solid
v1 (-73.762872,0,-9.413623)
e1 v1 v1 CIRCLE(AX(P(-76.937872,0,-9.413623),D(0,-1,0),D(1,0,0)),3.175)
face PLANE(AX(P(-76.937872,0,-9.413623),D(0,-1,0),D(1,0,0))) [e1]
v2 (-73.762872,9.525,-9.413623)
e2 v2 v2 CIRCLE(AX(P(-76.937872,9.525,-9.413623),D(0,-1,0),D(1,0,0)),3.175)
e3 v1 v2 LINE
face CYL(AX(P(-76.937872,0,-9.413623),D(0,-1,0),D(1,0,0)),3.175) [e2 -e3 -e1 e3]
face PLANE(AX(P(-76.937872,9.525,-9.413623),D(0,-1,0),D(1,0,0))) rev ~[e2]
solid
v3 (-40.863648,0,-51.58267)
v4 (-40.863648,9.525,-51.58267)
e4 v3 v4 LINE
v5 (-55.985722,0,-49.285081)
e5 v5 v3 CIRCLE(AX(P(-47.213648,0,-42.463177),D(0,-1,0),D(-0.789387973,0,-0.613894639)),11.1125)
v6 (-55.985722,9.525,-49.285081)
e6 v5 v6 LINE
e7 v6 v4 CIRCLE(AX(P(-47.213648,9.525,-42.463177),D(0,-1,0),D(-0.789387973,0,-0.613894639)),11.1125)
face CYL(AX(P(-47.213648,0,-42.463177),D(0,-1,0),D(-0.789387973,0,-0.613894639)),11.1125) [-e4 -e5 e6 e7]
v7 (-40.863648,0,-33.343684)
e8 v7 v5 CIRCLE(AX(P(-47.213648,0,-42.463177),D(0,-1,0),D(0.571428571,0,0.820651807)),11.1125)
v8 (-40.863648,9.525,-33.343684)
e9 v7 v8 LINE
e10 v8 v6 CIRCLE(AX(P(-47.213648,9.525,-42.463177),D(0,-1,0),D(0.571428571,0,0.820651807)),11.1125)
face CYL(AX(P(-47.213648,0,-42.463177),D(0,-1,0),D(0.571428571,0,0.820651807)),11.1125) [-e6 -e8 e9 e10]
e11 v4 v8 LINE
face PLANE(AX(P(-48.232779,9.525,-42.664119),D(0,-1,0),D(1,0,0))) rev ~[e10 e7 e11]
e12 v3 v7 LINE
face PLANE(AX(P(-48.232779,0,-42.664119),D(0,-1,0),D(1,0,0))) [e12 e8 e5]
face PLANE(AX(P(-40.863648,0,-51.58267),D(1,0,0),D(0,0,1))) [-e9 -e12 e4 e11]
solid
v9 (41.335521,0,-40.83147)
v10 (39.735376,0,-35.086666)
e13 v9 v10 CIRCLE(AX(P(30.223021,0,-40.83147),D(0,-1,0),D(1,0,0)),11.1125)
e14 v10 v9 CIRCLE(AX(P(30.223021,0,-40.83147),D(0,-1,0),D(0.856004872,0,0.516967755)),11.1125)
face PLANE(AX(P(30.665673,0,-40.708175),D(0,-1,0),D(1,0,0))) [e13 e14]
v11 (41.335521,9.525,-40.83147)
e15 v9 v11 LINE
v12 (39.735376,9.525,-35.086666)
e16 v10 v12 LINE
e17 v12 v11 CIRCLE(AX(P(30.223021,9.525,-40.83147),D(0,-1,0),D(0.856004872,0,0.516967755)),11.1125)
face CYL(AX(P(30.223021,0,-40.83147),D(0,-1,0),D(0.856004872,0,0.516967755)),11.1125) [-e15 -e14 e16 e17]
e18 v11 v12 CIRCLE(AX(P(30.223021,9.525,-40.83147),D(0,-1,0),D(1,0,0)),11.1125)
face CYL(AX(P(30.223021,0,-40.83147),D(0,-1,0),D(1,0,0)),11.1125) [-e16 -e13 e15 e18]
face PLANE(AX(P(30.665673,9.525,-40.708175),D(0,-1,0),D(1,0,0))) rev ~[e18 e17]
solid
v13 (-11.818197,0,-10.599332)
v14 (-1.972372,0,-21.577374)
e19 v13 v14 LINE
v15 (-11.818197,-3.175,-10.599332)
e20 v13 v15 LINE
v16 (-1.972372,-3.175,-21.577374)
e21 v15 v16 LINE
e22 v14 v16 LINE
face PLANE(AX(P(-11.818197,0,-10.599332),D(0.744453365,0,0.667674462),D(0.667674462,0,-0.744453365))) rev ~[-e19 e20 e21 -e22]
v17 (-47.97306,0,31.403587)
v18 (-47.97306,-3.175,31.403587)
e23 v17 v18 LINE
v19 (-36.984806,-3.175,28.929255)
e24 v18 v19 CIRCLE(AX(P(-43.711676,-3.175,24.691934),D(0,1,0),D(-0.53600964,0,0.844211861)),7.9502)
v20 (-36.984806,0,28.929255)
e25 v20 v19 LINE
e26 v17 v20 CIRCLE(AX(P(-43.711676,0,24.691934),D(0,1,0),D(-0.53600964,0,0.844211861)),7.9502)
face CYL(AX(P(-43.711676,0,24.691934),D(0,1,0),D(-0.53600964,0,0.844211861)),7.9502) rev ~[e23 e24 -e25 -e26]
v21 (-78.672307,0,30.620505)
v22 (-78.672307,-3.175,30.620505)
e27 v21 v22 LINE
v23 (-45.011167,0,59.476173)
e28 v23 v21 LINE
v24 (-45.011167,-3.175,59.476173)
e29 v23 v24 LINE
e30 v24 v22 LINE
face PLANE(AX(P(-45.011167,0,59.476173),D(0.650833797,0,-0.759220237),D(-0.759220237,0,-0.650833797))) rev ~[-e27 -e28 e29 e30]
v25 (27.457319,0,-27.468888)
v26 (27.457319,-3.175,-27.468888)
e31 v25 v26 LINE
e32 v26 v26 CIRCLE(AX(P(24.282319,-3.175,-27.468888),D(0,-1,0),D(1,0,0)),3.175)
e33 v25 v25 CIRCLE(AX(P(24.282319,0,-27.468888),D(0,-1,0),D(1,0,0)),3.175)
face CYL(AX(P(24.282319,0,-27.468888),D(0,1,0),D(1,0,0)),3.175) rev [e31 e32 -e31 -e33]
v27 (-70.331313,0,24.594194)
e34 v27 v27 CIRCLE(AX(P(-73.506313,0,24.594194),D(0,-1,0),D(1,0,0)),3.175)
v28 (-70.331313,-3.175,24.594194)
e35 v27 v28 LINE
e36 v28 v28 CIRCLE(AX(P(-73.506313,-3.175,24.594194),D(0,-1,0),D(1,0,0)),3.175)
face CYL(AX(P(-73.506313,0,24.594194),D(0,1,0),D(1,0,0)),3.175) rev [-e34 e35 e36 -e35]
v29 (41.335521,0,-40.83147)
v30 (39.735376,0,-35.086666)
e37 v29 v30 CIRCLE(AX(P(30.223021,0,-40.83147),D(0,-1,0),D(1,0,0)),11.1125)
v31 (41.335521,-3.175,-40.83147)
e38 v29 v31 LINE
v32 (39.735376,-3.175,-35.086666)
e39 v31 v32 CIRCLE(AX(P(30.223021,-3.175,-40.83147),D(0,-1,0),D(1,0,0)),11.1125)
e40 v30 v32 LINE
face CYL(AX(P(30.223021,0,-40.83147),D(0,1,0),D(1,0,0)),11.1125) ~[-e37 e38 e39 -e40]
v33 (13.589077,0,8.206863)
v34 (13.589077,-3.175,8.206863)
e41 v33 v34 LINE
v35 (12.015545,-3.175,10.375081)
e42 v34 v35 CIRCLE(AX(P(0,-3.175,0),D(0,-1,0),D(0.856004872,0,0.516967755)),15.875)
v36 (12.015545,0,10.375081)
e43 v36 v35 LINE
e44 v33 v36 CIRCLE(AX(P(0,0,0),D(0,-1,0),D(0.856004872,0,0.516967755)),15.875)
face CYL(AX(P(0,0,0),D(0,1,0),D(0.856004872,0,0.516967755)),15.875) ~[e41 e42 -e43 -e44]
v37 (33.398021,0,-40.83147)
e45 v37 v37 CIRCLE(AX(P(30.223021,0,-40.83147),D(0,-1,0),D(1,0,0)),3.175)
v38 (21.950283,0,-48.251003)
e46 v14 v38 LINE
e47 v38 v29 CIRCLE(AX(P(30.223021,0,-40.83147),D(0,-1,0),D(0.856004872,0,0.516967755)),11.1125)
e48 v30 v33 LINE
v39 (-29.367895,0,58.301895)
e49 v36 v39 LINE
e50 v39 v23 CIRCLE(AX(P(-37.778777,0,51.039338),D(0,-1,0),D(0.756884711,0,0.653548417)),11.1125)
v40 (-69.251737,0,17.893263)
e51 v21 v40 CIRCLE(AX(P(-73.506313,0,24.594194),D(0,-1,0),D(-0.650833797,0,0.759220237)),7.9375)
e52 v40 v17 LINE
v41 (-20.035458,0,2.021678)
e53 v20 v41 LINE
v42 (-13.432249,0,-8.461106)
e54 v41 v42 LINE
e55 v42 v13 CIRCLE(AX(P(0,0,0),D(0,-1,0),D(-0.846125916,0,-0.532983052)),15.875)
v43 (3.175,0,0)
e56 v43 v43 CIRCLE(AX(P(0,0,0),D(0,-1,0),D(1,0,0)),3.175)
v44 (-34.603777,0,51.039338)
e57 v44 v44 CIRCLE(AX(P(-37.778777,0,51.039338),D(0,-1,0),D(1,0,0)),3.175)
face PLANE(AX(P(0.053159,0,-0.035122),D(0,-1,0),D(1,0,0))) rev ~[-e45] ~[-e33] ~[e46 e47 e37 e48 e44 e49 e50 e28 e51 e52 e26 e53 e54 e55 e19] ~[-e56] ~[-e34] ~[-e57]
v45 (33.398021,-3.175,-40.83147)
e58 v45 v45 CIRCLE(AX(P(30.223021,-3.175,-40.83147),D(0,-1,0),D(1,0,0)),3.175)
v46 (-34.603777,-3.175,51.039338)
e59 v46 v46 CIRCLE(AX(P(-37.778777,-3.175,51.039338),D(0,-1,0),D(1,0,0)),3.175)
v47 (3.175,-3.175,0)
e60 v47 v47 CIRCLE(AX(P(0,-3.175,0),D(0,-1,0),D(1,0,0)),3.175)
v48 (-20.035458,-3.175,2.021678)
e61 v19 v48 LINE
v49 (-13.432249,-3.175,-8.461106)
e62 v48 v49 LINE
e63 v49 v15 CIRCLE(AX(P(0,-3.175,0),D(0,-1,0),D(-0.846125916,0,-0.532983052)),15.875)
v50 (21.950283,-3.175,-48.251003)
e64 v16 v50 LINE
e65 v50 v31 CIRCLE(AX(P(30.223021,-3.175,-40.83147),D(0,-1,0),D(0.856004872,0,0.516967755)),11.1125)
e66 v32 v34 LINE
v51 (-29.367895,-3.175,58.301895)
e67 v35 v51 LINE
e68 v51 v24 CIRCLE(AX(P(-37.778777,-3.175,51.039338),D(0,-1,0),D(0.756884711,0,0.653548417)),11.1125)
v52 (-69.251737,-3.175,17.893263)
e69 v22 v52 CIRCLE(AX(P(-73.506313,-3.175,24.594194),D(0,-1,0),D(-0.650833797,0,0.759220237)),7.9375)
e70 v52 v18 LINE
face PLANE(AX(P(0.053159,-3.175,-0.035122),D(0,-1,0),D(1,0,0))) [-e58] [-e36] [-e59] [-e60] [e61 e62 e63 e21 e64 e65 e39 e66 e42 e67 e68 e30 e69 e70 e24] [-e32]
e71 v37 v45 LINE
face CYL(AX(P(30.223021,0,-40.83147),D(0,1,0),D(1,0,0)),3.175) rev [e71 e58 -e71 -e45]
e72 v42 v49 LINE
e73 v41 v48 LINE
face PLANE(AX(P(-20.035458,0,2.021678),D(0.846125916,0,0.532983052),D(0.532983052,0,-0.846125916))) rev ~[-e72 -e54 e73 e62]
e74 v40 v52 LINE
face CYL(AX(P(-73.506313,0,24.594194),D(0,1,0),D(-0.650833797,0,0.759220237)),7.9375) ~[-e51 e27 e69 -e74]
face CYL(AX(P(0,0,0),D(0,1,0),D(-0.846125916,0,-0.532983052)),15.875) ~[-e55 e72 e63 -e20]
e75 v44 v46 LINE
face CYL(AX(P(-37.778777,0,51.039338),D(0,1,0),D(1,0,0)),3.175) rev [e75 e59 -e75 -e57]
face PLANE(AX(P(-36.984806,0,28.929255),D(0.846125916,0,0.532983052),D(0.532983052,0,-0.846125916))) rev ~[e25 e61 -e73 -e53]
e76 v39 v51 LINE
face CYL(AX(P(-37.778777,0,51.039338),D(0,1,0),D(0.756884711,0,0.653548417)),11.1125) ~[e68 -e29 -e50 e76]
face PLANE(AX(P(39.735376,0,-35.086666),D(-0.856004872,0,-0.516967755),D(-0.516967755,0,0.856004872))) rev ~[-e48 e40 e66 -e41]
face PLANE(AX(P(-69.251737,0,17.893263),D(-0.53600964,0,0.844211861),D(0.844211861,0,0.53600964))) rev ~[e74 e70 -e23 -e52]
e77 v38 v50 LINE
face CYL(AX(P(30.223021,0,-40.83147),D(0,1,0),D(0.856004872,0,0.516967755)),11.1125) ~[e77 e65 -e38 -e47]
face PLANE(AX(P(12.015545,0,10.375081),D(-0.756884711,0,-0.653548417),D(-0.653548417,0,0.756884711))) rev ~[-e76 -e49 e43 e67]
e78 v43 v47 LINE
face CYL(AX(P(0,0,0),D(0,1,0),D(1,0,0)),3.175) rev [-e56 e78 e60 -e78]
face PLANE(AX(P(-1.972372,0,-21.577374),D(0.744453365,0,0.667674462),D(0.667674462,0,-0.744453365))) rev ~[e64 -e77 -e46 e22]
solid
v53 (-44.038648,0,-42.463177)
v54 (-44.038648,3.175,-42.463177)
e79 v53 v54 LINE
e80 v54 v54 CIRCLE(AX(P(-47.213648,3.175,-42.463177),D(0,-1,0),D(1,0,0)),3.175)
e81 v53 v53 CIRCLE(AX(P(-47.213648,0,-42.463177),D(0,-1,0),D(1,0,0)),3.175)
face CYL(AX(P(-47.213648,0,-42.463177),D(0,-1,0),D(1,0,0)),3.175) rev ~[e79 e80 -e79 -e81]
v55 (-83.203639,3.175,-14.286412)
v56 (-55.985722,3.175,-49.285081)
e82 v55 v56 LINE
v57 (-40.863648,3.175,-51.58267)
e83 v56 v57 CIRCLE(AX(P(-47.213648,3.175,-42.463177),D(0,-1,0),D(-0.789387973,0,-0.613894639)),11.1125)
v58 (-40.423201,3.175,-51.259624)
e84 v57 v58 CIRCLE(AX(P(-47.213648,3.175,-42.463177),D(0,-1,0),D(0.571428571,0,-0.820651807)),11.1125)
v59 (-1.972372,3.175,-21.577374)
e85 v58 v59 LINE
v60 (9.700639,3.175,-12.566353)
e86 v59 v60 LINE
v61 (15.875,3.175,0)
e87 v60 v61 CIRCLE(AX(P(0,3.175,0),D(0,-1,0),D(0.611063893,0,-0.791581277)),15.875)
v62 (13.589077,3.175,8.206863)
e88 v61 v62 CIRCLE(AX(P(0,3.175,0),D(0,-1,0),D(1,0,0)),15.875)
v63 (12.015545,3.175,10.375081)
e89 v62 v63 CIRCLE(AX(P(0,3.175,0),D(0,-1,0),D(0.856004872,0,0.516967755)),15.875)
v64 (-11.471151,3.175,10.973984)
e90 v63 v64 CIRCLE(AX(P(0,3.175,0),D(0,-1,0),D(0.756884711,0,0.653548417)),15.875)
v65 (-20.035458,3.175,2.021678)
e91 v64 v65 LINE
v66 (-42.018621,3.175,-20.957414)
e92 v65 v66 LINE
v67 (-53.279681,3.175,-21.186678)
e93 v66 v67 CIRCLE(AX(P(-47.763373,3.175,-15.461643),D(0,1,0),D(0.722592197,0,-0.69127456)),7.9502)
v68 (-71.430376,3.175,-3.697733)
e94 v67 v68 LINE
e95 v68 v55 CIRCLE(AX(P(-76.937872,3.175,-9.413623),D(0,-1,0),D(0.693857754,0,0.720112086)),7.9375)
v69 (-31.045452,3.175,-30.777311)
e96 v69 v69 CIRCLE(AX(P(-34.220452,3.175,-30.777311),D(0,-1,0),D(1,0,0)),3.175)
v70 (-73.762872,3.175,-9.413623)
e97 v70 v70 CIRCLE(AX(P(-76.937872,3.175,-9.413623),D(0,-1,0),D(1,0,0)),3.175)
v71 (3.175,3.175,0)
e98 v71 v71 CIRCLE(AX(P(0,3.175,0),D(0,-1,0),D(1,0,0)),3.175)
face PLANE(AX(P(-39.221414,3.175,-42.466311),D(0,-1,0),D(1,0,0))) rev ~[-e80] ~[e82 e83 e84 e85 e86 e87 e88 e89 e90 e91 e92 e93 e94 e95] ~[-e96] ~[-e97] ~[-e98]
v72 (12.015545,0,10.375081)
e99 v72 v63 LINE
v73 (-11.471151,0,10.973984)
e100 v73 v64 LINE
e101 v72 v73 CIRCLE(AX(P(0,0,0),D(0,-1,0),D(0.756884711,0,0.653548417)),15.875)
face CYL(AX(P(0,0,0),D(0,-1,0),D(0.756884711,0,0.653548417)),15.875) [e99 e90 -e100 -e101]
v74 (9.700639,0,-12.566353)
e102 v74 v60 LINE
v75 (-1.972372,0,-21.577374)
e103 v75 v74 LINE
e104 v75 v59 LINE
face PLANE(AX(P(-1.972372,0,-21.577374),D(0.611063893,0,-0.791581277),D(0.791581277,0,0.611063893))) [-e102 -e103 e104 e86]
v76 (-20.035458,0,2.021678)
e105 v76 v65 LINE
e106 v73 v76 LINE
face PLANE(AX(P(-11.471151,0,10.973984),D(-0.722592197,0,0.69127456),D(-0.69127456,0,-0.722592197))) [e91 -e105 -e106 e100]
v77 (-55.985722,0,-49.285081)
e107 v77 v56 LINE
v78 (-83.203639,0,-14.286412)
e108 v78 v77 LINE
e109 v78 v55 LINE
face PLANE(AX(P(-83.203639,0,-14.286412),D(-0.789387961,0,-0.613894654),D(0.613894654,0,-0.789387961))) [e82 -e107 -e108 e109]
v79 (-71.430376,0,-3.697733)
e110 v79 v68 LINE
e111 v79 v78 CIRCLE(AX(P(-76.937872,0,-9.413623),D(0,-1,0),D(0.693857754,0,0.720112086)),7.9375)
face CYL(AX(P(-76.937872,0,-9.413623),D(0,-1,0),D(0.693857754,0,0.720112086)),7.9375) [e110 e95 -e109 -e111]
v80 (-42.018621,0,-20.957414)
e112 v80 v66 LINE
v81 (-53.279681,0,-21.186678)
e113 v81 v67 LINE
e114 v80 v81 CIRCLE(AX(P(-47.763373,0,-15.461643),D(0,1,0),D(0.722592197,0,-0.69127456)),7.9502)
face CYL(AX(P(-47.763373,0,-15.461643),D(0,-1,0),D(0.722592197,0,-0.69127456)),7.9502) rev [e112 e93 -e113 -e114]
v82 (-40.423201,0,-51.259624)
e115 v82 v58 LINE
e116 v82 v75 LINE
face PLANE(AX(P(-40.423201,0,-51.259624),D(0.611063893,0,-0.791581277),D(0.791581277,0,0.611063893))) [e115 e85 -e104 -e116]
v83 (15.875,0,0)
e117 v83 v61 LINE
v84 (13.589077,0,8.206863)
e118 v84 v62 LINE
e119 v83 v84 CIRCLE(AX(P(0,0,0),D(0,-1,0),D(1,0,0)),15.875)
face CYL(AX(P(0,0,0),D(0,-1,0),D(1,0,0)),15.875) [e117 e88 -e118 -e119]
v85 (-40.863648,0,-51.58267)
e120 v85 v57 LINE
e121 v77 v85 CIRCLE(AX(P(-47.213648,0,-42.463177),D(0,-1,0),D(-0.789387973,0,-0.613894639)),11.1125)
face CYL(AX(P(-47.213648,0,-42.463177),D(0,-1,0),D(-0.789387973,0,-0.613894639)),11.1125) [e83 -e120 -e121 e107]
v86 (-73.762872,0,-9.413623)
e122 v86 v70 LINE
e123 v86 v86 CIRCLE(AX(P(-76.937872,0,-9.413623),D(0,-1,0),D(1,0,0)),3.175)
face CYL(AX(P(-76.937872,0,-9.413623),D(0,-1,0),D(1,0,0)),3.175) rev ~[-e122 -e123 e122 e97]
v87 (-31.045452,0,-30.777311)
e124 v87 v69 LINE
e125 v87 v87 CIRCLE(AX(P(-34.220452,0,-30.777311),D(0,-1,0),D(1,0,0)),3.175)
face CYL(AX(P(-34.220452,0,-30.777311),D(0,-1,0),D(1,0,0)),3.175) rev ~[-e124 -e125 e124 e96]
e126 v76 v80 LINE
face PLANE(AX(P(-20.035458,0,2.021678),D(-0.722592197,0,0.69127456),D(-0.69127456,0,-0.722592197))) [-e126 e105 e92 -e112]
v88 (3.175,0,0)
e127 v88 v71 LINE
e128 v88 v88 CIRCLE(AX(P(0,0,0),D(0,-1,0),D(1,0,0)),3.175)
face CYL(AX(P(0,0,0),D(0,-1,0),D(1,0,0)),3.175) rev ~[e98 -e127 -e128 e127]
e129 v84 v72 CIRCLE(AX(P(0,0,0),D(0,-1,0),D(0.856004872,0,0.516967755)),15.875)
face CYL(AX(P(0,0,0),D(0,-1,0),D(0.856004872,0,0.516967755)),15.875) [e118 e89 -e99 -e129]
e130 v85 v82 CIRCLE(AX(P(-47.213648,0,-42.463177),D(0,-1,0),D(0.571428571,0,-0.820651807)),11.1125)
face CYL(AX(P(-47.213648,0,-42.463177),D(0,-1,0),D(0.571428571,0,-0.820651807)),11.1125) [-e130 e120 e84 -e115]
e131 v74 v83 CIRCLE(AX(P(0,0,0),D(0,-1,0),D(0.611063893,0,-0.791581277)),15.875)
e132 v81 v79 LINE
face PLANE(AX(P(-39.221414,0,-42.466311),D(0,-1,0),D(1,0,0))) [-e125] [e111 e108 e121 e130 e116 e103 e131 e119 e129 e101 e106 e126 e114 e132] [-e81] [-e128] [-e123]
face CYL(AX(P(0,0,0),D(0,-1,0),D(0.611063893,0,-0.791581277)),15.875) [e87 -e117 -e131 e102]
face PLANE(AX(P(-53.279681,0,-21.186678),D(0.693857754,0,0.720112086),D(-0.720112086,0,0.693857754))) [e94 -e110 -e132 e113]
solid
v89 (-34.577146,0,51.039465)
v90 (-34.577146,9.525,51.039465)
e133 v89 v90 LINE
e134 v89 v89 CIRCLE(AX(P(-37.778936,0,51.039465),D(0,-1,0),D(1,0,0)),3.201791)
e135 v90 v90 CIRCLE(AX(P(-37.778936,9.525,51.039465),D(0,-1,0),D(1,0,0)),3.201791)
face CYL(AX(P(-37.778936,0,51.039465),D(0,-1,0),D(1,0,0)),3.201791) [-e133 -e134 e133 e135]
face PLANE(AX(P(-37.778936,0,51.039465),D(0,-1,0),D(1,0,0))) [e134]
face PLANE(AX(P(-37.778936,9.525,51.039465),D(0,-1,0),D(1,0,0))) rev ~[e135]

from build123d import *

# Parameters (mm, degrees)
F0_R     = 3.175
F1_DEPTH = 3.175
F2_DEPTH = 3.175
F3_DEPTH = 3.175
F6_DEPTH = 9.525
F5_R     = 3.2017905818
F7_DEPTH = 9.525


with BuildPart() as f1:
    # F0 (on Front) → F1 (new body)
    with BuildSketch(Plane.XZ):
        with BuildLine():
            ThreePointArc((9.7006393072, -12.5663527737), (14.2480397599, -7.0006419705), (15.875, 0))
            ThreePointArc((15.875, 0), (15.2928451858, 4.2596374402), (13.589077339, 8.2068631081))
            ThreePointArc((13.589077339, 8.2068631081), (12.8481306417, 9.3242245797), (12.0155447944, 10.3750811223))
            ThreePointArc((12.0155447944, 10.3750811223), (0.4046753915, 15.8698412981), (-11.4711511247, 10.9739836374))
            ThreePointArc((-11.4711511247, 10.9739836374), (-15.7947937715, 1.5937737343), (-13.4322489239, -8.461105947))
            ThreePointArc((-13.4322489239, -8.461105947), (-12.6704088261, -9.5643277432), (-11.818197177, -10.5993320773))
            ThreePointArc((-11.818197177, -10.5993320773), (-1.4450970341, -15.8090897765), (9.7006393072, -12.5663527737))
        make_face()
        Circle(F0_R, mode=Mode.SUBTRACT)
        with BuildLine():
            Line((-1.9723715397, -21.5773737034), (9.7006393072, -12.5663527737))
            ThreePointArc((9.7006393072, -12.5663527737), (-1.4450970341, -15.8090897765), (-11.818197177, -10.5993320773))
            Line((-11.818197177, -10.5993320773), (-1.9723715397, -21.5773737034))
        make_face()
        with BuildLine():
            Line((-1.9723715397, -21.5773737034), (-11.818197177, -10.5993320773))
            ThreePointArc((-11.818197177, -10.5993320773), (-12.6704088261, -9.5643277432), (-13.4322489239, -8.461105947))
            Line((-13.4322489239, -8.461105947), (-20.0354577926, 2.0216779558))
            Line((-20.0354577926, 2.0216779558), (-42.0186206254, -20.9574143581))
            ThreePointArc((-42.0186206254, -20.9574143581), (-47.601548398, -23.4101962273), (-53.2796810271, -21.1866784606))
            Line((-53.2796810271, -21.1866784606), (-71.4303764219, -3.6977333553))
            ThreePointArc((-71.4303764219, -3.6977333553), (-69.6330912018, -6.308131344), (-69.0003723469, -9.4136230398))
            ThreePointArc((-69.0003723469, -9.4136230398), (-74.3620830362, -16.921566545), (-83.2036392891, -14.2864118589))
            Line((-83.2036392891, -14.2864118589), (-55.9857223186, -49.2850811473))
            ThreePointArc((-55.9857223186, -49.2850811473), (-55.2758223722, -34.8153662876), (-40.8636484691, -33.3436837668))
            ThreePointArc((-40.8636484691, -33.3436837668), (-37.3634700126, -37.3190890389), (-36.1011484691, -42.4631769682))
            ThreePointArc((-36.1011484691, -42.4631769682), (-37.2400206372, -47.3636263476), (-40.4232009541, -51.2596239098))
            Line((-40.4232009541, -51.2596239098), (-1.9723715397, -21.5773737034))
        make_face()
        with Locations((-34.2204524104, -30.7773106666)):
            Circle(F0_R, mode=Mode.SUBTRACT)
        with BuildLine():
            ThreePointArc((-13.4322489239, -8.461105947), (-15.7947937715, 1.5937737343), (-11.4711511247, 10.9739836374))
            Line((-11.4711511247, 10.9739836374), (-20.0354577926, 2.0216779558))
            Line((-20.0354577926, 2.0216779558), (-13.4322489239, -8.461105947))
        make_face()
        with BuildLine():
            ThreePointArc((-55.9857223186, -49.2850811473), (-48.882881605, -53.4495920791), (-40.8636484691, -51.5826701696))
            Line((-40.8636484691, -51.5826701696), (-40.8636484691, -33.3436837668))
            ThreePointArc((-40.8636484691, -33.3436837668), (-55.2758223722, -34.8153662876), (-55.9857223186, -49.2850811473))
        make_face()
        with Locations((-47.2136484691, -42.4631769682)):
            Circle(F0_R, mode=Mode.SUBTRACT)
        with BuildLine():
            ThreePointArc((-71.4303764219, -3.6977333553), (-82.2457694679, -3.5119169812), (-83.2036392891, -14.2864118589))
            ThreePointArc((-83.2036392891, -14.2864118589), (-74.3620830362, -16.921566545), (-69.0003723469, -9.4136230398))
            ThreePointArc((-69.0003723469, -9.4136230398), (-69.6330912018, -6.308131344), (-71.4303764219, -3.6977333553))
        make_face()
        with Locations((-76.9378723469, -9.4136230398)):
            Circle(F0_R, mode=Mode.SUBTRACT)
    extrude(amount=-F1_DEPTH)

    # F0 (on Front) → F3 (join)
    with BuildSketch(Plane.XZ):
        with BuildLine():
            ThreePointArc((-40.8636484691, -51.5826701696), (-40.64143956, -51.4238536338), (-40.4232009541, -51.2596239098))
            ThreePointArc((-40.4232009541, -51.2596239098), (-37.2400206372, -47.3636263476), (-36.1011484691, -42.4631769682))
            ThreePointArc((-36.1011484691, -42.4631769682), (-37.3634700126, -37.3190890389), (-40.8636484691, -33.3436837668))
            Line((-40.8636484691, -33.3436837668), (-40.8636484691, -51.5826701696))
        make_face()
    extrude(amount=-F3_DEPTH)


with BuildPart() as f2:
    # F0 (on Front) → F2 (new body)
    with BuildSketch(Plane.XZ):
        with BuildLine():
            ThreePointArc((9.7006393072, -12.5663527737), (14.2480397599, -7.0006419705), (15.875, 0))
            ThreePointArc((15.875, 0), (15.2928451858, 4.2596374402), (13.589077339, 8.2068631081))
            ThreePointArc((13.589077339, 8.2068631081), (12.8481306417, 9.3242245797), (12.0155447944, 10.3750811223))
            ThreePointArc((12.0155447944, 10.3750811223), (0.4046753915, 15.8698412981), (-11.4711511247, 10.9739836374))
            ThreePointArc((-11.4711511247, 10.9739836374), (-15.7947937715, 1.5937737343), (-13.4322489239, -8.461105947))
            ThreePointArc((-13.4322489239, -8.461105947), (-12.6704088261, -9.5643277432), (-11.818197177, -10.5993320773))
            ThreePointArc((-11.818197177, -10.5993320773), (-1.4450970341, -15.8090897765), (9.7006393072, -12.5663527737))
        make_face()
        Circle(F0_R, mode=Mode.SUBTRACT)
        with BuildLine():
            ThreePointArc((13.589077339, 8.2068631081), (15.2928451858, 4.2596374402), (15.875, 0))
            ThreePointArc((15.875, 0), (14.2480397599, -7.0006419705), (9.7006393072, -12.5663527737))
            Line((9.7006393072, -12.5663527737), (-1.9723715397, -21.5773737034))
            Line((-1.9723715397, -21.5773737034), (21.9502834065, -48.2510028613))
            ThreePointArc((21.9502834065, -48.2510028613), (23.6117354925, -31.8995862557), (39.7353755677, -35.0866662316))
            Line((39.7353755677, -35.0866662316), (13.589077339, 8.2068631081))
        make_face()
        with Locations((24.2823193089, -27.4688883834)):
            Circle(F0_R, mode=Mode.SUBTRACT)
        with BuildLine():
            Line((-1.9723715397, -21.5773737034), (9.7006393072, -12.5663527737))
            ThreePointArc((9.7006393072, -12.5663527737), (-1.4450970341, -15.8090897765), (-11.818197177, -10.5993320773))
            Line((-11.818197177, -10.5993320773), (-1.9723715397, -21.5773737034))
        make_face()
        with BuildLine():
            ThreePointArc((-11.4711511247, 10.9739836374), (0.4046753915, 15.8698412981), (12.0155447944, 10.3750811223))
            Line((12.0155447944, 10.3750811223), (-29.3678954319, 58.3018947947))
            ThreePointArc((-29.3678954319, 58.3018947947), (-27.3635577476, 54.9137242302), (-26.666276788, 51.0393380091))
            ThreePointArc((-26.666276788, 51.0393380091), (-42.4219285212, 40.9433586989), (-45.0111673585, 59.4761728946))
            Line((-45.0111673585, 59.4761728946), (-78.6723066589, 30.62050489))
            ThreePointArc((-78.6723066589, 30.62050489), (-70.189776442, 31.8056080505), (-65.5688133943, 24.5941942575))
            ThreePointArc((-65.5688133943, 24.5941942575), (-66.5502150866, 20.7710276925), (-69.2517368799, 17.8932626108))
            Line((-69.2517368799, 17.8932626108), (-47.9730600876, 31.4035867439))
            ThreePointArc((-47.9730600876, 31.4035867439), (-41.9651841532, 32.4479277656), (-36.9848059896, 28.9292554649))
            Line((-36.9848059896, 28.9292554649), (-20.0354577926, 2.0216779558))
            Line((-20.0354577926, 2.0216779558), (-11.4711511247, 10.9739836374))
        make_face()
        with BuildLine():
            ThreePointArc((41.3355214304, -40.8314704072), (40.9280130605, -37.8497241991), (39.7353755677, -35.0866662316))
            ThreePointArc((39.7353755677, -35.0866662316), (23.6117354925, -31.8995862557), (21.9502834065, -48.2510028613))
            ThreePointArc((21.9502834065, -48.2510028613), (34.1952283081, -51.2097760864), (41.3355214304, -40.8314704072))
        make_face()
        with Locations((30.2230214304, -40.8314704072)):
            Circle(F0_R, mode=Mode.SUBTRACT)
        with BuildLine():
            ThreePointArc((-13.4322489239, -8.461105947), (-15.7947937715, 1.5937737343), (-11.4711511247, 10.9739836374))
            Line((-11.4711511247, 10.9739836374), (-20.0354577926, 2.0216779558))
            Line((-20.0354577926, 2.0216779558), (-13.4322489239, -8.461105947))
        make_face()
        with BuildLine():
            ThreePointArc((-26.666276788, 51.0393380091), (-27.3635577476, 54.9137242302), (-29.3678954319, 58.3018947947))
            ThreePointArc((-29.3678954319, 58.3018947947), (-36.9469460378, 62.1206607574), (-45.0111673585, 59.4761728946))
            ThreePointArc((-45.0111673585, 59.4761728946), (-42.4219285212, 40.9433586989), (-26.666276788, 51.0393380091))
        make_face()
        with Locations((-37.778776788, 51.0393380091)):
            Circle(F0_R, mode=Mode.SUBTRACT)
        with BuildLine():
            ThreePointArc((-65.5688133943, 24.5941942575), (-70.189776442, 31.8056080505), (-78.6723066589, 30.62050489))
            ThreePointArc((-78.6723066589, 30.62050489), (-79.8862306455, 19.871847159), (-69.2517368799, 17.8932626108))
            ThreePointArc((-69.2517368799, 17.8932626108), (-66.5502150866, 20.7710276925), (-65.5688133943, 24.5941942575))
        make_face()
        with Locations((-73.5063133943, 24.5941942575)):
            Circle(F0_R, mode=Mode.SUBTRACT)
    extrude(amount=F2_DEPTH)


with BuildPart() as f6:
    # F0 (on Front) → F6 (new body, through all)
    with BuildSketch(Plane.XZ):
        with BuildLine():
            ThreePointArc((41.3355214304, -40.8314704072), (40.9280130605, -37.8497241991), (39.7353755677, -35.0866662316))
            ThreePointArc((39.7353755677, -35.0866662316), (23.6117354925, -31.8995862557), (21.9502834065, -48.2510028613))
            ThreePointArc((21.9502834065, -48.2510028613), (34.1952283081, -51.2097760864), (41.3355214304, -40.8314704072))
        make_face()
        with Locations((30.2230214304, -40.8314704072)):
            Circle(F0_R, mode=Mode.SUBTRACT)
        with Locations((30.2230214304, -40.8314704072)):
            Circle(F0_R)
    extrude(amount=-F6_DEPTH)


with BuildPart() as f6b:
    # F0 (on Front) → F6, piece 2 (new body, through all)
    with BuildSketch(Plane.XZ):
        with BuildLine():
            ThreePointArc((-55.9857223186, -49.2850811473), (-48.882881605, -53.4495920791), (-40.8636484691, -51.5826701696))
            Line((-40.8636484691, -51.5826701696), (-40.8636484691, -33.3436837668))
            ThreePointArc((-40.8636484691, -33.3436837668), (-55.2758223722, -34.8153662876), (-55.9857223186, -49.2850811473))
        make_face()
        with Locations((-47.2136484691, -42.4631769682)):
            Circle(F0_R, mode=Mode.SUBTRACT)
        with Locations((-47.2136484691, -42.4631769682)):
            Circle(F0_R)
    extrude(amount=-F6_DEPTH)


with BuildPart() as f6c:
    # F5 (on Front) → F6, piece 3 (new body, through all)
    with BuildSketch(Plane.XZ):
        with Locations((-37.7789363265, 51.0394647717)):
            Circle(F5_R)
    extrude(amount=-F6_DEPTH)


with BuildPart() as f7:
    # F0 (on Front) → F7 (new body, through all)
    with BuildSketch(Plane.XZ):
        with Locations((-76.9378723469, -9.4136230398)):
            Circle(F0_R)
    extrude(amount=-F7_DEPTH)


solid = Compound([f1.part, f2.part, f6.part, f6b.part, f6c.part, f7.part])
